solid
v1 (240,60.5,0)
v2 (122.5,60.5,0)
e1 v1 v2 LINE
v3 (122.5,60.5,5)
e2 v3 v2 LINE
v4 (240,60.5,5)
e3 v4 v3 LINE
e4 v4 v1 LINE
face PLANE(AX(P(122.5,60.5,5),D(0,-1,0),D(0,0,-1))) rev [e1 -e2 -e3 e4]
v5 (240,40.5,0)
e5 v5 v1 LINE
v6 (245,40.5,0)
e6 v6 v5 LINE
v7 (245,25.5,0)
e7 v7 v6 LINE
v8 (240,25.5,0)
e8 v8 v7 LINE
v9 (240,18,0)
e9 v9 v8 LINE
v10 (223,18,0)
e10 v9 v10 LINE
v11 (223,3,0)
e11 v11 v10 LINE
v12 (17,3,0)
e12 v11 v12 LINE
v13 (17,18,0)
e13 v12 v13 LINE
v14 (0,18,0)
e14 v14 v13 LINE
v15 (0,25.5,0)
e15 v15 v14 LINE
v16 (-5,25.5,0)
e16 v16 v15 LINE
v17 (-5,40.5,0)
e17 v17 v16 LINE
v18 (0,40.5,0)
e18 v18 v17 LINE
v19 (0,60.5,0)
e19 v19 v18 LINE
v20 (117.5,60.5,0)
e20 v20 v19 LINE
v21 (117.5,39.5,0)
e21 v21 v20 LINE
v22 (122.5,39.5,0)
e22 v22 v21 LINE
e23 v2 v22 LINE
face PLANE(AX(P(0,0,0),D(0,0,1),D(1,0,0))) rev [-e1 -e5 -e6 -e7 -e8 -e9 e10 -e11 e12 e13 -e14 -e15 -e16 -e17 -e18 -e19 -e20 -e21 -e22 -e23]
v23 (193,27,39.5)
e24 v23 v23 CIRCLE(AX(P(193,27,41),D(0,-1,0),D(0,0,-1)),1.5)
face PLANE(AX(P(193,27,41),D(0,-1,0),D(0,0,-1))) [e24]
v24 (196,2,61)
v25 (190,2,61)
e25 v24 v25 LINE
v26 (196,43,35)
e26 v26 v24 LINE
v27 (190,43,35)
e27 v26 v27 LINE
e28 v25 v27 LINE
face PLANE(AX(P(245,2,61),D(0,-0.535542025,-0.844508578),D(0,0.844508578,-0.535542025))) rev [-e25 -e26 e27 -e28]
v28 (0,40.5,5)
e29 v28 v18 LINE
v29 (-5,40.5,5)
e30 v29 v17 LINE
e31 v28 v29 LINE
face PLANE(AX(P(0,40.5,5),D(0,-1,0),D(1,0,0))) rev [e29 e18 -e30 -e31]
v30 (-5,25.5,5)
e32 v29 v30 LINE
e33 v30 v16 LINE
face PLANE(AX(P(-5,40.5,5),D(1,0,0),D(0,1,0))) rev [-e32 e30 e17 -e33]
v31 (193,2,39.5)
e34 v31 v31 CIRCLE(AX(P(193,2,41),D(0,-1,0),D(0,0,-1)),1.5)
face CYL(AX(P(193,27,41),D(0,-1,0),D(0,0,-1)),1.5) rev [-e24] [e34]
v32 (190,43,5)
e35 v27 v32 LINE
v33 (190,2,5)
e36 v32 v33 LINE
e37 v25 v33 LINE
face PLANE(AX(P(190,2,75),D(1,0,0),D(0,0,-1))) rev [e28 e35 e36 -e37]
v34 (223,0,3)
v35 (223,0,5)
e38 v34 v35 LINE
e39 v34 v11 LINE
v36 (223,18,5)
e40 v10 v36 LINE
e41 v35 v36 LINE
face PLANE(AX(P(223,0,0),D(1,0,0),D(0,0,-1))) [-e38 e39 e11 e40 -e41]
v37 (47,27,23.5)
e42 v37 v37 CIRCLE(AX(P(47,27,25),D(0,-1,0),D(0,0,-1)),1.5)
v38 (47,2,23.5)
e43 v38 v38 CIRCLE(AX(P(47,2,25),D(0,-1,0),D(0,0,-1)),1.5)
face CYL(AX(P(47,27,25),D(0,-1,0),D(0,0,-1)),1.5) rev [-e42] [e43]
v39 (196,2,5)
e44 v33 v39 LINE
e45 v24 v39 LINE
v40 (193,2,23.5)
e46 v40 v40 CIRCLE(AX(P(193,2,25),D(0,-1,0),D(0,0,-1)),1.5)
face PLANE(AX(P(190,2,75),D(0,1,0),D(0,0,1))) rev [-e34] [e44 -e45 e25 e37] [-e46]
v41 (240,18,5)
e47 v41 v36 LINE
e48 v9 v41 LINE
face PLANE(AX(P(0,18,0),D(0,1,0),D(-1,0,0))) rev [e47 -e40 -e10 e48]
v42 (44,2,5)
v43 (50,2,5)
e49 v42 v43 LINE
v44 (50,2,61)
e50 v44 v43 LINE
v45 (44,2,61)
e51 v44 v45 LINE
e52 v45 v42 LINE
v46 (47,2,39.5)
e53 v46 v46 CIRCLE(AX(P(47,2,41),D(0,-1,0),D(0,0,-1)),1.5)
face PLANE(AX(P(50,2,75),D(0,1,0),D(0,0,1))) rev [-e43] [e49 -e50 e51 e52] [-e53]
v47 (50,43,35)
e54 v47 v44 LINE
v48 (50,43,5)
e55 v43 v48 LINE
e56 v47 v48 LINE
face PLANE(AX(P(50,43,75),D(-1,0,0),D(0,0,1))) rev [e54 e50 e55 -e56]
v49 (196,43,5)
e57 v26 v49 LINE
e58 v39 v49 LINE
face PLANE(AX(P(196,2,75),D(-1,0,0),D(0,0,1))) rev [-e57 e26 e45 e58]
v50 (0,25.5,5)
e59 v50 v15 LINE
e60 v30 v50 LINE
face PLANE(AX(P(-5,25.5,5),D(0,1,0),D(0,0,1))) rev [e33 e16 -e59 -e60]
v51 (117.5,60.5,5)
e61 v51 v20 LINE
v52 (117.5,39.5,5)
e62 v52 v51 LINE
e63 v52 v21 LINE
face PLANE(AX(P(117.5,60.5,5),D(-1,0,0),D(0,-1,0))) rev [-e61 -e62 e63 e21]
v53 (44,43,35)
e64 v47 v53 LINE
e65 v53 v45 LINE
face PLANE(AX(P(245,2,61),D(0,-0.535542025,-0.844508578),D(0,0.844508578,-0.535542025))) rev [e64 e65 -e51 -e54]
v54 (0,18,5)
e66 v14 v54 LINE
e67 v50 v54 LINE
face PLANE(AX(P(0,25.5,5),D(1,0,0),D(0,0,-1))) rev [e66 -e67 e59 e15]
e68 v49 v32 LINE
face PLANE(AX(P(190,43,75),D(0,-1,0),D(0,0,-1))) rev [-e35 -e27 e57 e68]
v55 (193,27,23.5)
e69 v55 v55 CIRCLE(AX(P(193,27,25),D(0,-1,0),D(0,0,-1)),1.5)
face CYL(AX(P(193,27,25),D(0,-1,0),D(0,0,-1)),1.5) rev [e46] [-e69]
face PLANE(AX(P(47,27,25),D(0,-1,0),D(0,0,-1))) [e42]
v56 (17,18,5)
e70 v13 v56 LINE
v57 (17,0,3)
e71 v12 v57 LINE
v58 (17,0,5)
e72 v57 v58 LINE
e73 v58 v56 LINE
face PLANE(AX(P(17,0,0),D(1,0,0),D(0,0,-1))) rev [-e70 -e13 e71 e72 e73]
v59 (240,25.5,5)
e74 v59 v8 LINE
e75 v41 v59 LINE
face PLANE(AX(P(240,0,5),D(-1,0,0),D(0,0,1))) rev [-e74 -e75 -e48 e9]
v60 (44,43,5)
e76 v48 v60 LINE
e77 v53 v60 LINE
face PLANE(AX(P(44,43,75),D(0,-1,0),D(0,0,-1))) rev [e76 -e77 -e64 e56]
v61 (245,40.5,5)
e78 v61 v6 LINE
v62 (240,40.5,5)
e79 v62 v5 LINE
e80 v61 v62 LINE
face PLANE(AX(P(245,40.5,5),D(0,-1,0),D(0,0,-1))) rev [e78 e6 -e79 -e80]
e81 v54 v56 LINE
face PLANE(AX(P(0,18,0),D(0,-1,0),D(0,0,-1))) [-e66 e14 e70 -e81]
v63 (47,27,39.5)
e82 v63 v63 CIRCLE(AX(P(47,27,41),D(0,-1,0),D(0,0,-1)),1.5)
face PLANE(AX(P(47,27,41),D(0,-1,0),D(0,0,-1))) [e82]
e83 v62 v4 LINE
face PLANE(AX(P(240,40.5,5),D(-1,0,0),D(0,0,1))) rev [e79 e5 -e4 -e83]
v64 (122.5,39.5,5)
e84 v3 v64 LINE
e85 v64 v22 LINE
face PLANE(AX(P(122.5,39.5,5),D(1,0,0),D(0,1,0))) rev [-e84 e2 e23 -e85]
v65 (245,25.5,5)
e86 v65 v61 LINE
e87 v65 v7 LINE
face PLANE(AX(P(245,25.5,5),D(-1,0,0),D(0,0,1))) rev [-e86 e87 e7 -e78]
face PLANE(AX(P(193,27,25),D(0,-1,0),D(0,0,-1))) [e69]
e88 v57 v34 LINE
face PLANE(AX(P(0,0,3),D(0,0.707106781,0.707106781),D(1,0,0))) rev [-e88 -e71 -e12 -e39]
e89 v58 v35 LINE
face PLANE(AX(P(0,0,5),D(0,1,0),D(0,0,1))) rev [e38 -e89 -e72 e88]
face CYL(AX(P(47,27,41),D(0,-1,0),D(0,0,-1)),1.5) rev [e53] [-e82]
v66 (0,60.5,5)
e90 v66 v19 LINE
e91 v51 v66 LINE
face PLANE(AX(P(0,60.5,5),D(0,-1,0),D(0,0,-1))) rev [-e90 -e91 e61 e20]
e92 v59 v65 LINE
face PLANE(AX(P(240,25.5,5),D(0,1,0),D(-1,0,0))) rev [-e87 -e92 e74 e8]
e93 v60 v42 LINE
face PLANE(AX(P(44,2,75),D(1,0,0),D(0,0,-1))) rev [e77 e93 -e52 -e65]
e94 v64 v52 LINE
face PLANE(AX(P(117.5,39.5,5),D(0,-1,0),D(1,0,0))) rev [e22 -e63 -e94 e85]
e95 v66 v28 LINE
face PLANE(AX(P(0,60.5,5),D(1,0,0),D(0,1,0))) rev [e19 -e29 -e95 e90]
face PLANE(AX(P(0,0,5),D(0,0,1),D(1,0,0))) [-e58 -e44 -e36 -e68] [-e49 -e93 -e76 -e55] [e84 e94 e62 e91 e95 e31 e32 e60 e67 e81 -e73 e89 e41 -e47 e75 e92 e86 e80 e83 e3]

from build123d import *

# Parameters (mm, degrees)
BOSS_EXTRU_1_DEPTH      = 5
ESQUISSE2_W             = 17
ESQUISSE2_H             = 18
ENL_V_MAT_EXTRU_1_DEPTH = 253.408894455
ESQUISSE3_W             = 6
ESQUISSE3_H             = 41
BOSS_EXTRU_2_DEPTH      = 70
ENL_V_MAT_EXTRU_3_DEPTH = 223.904127373
CHANFREIN1_SIZE         = 3
ESQUISSE7_R             = 1.5
ENL_V_MAT_EXTRU_4_DEPTH = 25


# Read off the part's stored shape, not the designer's step: Boss.-Extru.1
with BuildPart() as part:
    # Boss.-Extru.1 outline → Boss.-Extru.1 (new body)
    with BuildSketch(Plane.XY):
        Polygon((0, 25.5), (0, 0), (240, 0), (240, 25.5), (245, 25.5), (245, 40.5), (240, 40.5), (240, 60.5), (122.5, 60.5), (122.5, 39.5), (117.5, 39.5), (117.5, 60.5), (0, 60.5), (0, 40.5), (-5, 40.5), (-5, 25.5), align=None)
    extrude(amount=BOSS_EXTRU_1_DEPTH)

    # Esquisse2 → Enlèv. mat.-Extru.1 (cut, through all)
    with BuildSketch(Plane.XY.offset(5)):
        with Locations((231.5, 9)):
            Rectangle(ESQUISSE2_W, ESQUISSE2_H)
        with Locations((8.5, 9)):
            Rectangle(ESQUISSE2_W, ESQUISSE2_H)
    extrude(amount=-ENL_V_MAT_EXTRU_1_DEPTH, mode=Mode.SUBTRACT)

    # Esquisse3 → Boss.-Extru.2 (add)
    with BuildSketch(Plane.XY.offset(5)):
        with Locations((47, 22.5)):
            Rectangle(ESQUISSE3_W, ESQUISSE3_H)
        with Locations((193, 22.5)):
            Rectangle(ESQUISSE3_W, ESQUISSE3_H)
    extrude(amount=BOSS_EXTRU_2_DEPTH)

    # Esquisse6 → Enlèv. mat.-Extru.3 (cut, through all)
    with BuildSketch(Plane.ZY.offset(-44)):
        Polygon((35, 43), (75, 43), (75, 2), (61, 2), align=None)
    extrude(amount=-ENL_V_MAT_EXTRU_3_DEPTH, mode=Mode.SUBTRACT)

    # Chanfrein1
    chanfrein1_edges = [part.edges().sort_by_distance(p)[0] for p in [
        (120, 0, 0),
    ]]
    chamfer(chanfrein1_edges, length=CHANFREIN1_SIZE)

    # Esquisse7 → Enlèv. mat.-Extru.4 (cut)
    with BuildSketch(Plane.XZ.offset(-2)):
        with Locations(Location((47, 25, 0), (0, 0, 270))):
            Circle(ESQUISSE7_R)
        with Locations(Location((47, 41, 0), (0, 0, 270))):
            Circle(ESQUISSE7_R)
        with Locations(Location((193, 41, 0), (0, 0, 270))):
            Circle(ESQUISSE7_R)
        with Locations(Location((193, 25, 0), (0, 0, 270))):
            Circle(ESQUISSE7_R)
    extrude(amount=-ENL_V_MAT_EXTRU_4_DEPTH, mode=Mode.SUBTRACT)


solid = part.part
